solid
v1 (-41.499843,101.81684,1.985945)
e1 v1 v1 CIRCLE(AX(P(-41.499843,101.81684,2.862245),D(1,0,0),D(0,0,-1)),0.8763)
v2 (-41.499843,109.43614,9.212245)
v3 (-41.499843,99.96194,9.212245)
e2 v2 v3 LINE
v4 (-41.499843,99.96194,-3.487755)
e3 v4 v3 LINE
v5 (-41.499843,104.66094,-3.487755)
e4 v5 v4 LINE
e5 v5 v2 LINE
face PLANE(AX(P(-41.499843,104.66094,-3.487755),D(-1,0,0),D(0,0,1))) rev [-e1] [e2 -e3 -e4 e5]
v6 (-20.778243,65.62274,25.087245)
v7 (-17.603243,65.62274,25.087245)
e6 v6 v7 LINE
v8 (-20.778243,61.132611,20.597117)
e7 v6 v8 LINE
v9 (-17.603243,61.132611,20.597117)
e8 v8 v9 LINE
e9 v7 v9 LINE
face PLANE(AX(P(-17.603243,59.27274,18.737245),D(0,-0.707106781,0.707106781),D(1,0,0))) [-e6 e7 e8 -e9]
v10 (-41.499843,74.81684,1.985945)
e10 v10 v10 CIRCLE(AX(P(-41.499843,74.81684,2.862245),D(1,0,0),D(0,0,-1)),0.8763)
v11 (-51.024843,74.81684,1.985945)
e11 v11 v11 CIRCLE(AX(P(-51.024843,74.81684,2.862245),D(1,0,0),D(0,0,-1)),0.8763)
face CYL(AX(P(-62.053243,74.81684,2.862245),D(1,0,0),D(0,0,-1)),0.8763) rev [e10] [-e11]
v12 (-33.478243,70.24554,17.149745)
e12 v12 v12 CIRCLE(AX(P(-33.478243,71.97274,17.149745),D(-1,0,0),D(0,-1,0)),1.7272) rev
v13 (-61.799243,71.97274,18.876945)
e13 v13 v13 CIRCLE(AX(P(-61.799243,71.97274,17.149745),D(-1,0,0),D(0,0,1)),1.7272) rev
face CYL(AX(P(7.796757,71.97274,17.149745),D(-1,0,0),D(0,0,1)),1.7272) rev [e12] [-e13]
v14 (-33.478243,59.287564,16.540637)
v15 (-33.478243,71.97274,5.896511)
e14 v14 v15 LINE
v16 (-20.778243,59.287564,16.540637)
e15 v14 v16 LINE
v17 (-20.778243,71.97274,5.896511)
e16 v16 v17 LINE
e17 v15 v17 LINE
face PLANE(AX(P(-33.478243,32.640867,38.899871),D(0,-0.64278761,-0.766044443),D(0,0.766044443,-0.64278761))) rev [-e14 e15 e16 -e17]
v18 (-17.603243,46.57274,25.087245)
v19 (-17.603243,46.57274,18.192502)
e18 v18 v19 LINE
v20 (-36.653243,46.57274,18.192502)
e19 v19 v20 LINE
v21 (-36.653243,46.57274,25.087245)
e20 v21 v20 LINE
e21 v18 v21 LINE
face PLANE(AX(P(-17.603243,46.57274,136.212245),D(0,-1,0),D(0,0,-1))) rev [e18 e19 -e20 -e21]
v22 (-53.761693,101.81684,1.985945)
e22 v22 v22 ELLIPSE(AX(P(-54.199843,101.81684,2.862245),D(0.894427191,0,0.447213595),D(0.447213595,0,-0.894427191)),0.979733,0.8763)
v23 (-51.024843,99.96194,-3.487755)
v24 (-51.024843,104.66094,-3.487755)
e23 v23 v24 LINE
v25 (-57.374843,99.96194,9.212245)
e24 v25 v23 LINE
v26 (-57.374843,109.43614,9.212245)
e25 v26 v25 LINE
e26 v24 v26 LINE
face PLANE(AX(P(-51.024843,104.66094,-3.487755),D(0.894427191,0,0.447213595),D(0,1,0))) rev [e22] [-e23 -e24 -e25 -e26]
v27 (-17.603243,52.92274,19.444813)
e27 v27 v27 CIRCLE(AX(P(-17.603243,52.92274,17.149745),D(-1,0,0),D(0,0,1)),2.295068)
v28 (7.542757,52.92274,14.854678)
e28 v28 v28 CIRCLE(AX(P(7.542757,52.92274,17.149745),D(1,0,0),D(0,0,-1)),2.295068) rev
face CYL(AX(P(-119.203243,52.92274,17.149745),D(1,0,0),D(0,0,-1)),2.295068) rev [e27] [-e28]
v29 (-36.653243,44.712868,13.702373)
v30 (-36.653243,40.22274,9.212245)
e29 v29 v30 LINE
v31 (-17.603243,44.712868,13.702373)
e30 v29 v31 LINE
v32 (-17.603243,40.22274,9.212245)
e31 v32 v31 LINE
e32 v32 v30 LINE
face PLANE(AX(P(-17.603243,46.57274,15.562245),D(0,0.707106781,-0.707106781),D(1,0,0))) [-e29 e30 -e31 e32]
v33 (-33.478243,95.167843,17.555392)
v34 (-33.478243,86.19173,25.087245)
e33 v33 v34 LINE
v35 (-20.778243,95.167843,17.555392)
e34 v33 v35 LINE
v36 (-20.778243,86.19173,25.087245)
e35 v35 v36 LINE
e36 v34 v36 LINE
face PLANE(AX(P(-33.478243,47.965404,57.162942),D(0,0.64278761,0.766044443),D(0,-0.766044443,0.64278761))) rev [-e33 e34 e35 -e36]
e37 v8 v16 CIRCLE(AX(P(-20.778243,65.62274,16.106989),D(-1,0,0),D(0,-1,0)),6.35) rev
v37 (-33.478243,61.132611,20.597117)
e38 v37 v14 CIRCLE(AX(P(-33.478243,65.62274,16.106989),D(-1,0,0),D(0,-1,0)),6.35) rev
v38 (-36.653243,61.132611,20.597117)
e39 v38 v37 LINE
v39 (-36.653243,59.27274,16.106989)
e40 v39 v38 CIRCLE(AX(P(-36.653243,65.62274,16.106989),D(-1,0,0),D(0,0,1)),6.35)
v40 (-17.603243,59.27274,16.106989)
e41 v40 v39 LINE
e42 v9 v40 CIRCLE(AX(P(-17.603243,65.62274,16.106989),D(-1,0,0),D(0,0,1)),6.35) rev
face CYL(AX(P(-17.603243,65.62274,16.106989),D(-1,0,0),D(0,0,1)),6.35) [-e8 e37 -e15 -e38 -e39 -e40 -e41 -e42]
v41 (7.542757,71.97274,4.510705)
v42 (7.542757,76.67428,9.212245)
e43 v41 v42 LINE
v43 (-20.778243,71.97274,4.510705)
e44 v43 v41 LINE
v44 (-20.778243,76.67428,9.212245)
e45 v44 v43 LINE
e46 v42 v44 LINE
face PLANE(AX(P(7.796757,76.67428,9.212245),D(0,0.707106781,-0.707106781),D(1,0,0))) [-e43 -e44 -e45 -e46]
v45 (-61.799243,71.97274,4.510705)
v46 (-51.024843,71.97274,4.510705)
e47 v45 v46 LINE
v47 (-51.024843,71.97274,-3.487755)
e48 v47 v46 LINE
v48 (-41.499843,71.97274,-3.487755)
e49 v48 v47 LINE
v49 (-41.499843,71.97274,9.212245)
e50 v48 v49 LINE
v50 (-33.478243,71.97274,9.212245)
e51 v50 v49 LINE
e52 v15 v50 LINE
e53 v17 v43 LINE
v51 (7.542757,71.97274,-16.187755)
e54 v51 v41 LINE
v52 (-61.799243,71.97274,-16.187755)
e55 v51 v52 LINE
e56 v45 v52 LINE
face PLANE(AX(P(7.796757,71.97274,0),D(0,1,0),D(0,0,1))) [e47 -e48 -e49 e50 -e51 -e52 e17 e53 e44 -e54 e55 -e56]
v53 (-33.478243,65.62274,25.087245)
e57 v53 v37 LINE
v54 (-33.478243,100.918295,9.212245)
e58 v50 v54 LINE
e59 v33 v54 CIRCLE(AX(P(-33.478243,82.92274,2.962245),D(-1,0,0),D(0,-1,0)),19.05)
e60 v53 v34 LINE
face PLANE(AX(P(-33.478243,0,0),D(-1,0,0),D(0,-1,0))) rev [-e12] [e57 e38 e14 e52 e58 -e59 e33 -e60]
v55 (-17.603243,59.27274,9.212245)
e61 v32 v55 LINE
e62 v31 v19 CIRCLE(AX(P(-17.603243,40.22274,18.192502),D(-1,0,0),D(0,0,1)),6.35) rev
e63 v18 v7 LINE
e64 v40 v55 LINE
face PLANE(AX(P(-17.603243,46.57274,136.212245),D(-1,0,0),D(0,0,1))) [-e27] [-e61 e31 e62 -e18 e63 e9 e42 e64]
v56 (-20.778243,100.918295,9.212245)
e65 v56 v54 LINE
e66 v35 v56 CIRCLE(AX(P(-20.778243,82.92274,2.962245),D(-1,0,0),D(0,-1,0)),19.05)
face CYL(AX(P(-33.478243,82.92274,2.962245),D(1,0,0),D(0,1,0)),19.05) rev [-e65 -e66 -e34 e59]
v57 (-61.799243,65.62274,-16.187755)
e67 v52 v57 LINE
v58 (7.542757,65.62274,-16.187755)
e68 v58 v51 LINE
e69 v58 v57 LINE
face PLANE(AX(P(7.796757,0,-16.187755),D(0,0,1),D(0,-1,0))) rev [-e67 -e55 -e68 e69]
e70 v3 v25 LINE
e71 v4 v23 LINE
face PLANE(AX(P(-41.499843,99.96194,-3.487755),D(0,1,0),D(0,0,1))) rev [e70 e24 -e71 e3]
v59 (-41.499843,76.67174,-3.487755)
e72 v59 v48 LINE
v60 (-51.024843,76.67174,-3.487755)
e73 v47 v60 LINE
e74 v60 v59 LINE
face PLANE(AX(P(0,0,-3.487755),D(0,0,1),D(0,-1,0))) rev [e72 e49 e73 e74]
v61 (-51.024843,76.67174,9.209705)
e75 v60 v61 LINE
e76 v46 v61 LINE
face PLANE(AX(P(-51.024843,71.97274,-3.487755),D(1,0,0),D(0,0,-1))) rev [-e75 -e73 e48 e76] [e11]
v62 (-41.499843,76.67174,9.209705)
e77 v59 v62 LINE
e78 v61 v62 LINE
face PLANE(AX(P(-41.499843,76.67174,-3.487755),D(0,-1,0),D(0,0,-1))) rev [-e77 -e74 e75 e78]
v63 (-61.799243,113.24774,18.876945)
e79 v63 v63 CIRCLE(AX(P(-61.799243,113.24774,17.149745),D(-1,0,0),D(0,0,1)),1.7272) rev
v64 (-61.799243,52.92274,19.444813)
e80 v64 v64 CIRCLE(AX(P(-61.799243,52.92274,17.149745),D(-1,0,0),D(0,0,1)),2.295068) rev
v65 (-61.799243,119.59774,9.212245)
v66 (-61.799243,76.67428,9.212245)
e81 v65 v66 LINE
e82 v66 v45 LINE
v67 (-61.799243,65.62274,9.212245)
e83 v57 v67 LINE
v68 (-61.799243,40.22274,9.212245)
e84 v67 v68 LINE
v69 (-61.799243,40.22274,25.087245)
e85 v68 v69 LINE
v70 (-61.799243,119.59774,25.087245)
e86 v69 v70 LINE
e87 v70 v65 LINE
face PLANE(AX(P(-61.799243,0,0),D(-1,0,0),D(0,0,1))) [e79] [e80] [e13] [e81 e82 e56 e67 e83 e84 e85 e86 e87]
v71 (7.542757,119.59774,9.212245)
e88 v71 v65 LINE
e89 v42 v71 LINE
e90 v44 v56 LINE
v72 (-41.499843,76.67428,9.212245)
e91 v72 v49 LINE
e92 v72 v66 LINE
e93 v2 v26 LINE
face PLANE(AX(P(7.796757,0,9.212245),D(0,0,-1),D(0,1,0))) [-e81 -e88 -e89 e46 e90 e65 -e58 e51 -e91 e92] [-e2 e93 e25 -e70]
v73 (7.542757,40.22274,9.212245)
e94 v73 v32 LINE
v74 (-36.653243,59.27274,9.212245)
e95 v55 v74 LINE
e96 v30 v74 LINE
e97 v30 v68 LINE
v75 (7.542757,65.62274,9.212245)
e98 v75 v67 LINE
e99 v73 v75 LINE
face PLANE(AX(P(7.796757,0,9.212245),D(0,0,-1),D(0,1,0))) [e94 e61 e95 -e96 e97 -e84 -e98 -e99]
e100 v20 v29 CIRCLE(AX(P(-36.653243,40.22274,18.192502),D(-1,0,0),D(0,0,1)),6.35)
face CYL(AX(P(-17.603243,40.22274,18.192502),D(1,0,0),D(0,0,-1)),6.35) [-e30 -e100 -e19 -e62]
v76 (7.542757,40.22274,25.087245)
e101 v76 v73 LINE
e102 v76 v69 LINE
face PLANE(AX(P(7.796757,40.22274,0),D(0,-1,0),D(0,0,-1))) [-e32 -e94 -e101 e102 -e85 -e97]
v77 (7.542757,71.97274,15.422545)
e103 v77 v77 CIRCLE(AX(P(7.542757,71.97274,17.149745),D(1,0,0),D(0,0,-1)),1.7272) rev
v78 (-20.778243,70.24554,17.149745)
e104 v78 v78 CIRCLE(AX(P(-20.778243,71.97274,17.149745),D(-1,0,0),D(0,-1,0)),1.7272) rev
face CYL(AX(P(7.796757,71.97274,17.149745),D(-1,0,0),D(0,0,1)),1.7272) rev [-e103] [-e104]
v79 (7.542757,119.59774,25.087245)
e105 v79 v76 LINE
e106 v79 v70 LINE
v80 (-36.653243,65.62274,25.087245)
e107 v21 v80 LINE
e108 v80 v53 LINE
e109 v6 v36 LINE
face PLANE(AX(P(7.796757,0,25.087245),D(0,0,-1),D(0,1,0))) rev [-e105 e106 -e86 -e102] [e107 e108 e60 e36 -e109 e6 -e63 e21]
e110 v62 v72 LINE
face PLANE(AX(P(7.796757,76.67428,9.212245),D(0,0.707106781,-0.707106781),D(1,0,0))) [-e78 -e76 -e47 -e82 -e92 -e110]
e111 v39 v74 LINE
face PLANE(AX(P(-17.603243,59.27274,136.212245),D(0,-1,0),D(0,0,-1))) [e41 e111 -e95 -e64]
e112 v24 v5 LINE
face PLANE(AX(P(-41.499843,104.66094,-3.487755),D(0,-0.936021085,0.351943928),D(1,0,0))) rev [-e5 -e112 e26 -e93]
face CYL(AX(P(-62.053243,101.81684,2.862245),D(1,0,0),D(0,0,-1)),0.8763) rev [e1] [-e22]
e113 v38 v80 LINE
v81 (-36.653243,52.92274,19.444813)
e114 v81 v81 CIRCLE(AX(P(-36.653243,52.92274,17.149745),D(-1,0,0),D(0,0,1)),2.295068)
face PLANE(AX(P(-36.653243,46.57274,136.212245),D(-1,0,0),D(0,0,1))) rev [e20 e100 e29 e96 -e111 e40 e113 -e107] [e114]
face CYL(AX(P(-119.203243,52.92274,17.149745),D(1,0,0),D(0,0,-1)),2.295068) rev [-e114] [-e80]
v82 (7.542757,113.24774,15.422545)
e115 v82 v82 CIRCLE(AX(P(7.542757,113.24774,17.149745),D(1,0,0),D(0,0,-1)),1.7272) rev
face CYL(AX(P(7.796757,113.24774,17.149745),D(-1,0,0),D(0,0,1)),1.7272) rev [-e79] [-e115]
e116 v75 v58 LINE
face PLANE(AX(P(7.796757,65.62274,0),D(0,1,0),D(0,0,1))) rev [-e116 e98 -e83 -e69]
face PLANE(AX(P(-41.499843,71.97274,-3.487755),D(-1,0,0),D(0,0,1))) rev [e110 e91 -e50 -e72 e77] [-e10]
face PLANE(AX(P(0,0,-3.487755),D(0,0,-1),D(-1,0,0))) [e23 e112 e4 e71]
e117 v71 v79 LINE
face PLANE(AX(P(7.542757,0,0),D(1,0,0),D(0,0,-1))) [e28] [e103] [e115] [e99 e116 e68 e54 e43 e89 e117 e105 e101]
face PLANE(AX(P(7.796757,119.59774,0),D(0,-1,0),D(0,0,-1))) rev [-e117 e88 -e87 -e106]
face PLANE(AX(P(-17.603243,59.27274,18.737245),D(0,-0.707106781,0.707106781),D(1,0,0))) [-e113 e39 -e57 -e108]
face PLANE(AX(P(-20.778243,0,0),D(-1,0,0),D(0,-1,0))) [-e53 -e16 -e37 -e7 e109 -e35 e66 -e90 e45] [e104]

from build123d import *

# Parameters (mm, degrees)
SKETCH2_W               = 15.875
SKETCH2_H               = 79.375
SKETCH2_R               = 1.7272
SKETCH2_W_2             = 25.4
SKETCH2_H_2             = 6.35
BOSS_EXTRUDE1_DEPTH     = 69.85
SKETCH3_W               = 19.05
SKETCH3_H               = 12.7
CUT_EXTRUDE1_DEPTH      = 127
SKETCH4_R               = 2.2950679
CUT_EXTRUDE2_DEPTH      = 127
CHAMFER1_SIZE           = 6.35
FILLET2_R               = 6.35
CUT_EXTRUDE3_DEPTH      = 6.35
CUT_EXTRUDE3_DEPTH_BACK = 6.35
SKETCH8_R               = 2.4
SKETCH10_W              = 9.525
SKETCH10_H              = 4.699
BOSS_EXTRUDE2_DEPTH     = 12.7
SKETCH12_R              = 0.8763
CUT_EXTRUDE4_DEPTH      = 132.769283049
CHAMFER2_SIZE           = 4.7752
CHAMFER2_SIZE_2         = 12.7
CHAMFER3_SIZE           = 4.70154
CHAMFER4_SIZE           = 6.35
CHAMFER4_SIZE_2         = 12.7
CUT_EXTRUDE5_DEPTH      = 0.254
CUT_EXTRUDE6_DEPTH      = 0.254


# Some blends are built 0.0001 mm under size
with BuildPart() as part:
    # Sketch2 → Boss-Extrude1 (new body)
    # profile 1 of 2: a face of its own
    with BuildSketch(Plane.ZY.offset(62.053242547)):
        with Locations((17.149745439, 79.910239505)):
            Rectangle(SKETCH2_W, SKETCH2_H)
        with Locations((17.149745439, 113.247739505)):
            Circle(SKETCH2_R, mode=Mode.SUBTRACT)
        with Locations((17.149745439, 71.972739505)):
            Circle(SKETCH2_R, mode=Mode.SUBTRACT)
    # profile 2 of 2: a face of its own
    with BuildSketch(Plane.ZY.offset(62.053242547)):
        with Locations((-3.487754561, 68.797739505)):
            Rectangle(SKETCH2_W_2, SKETCH2_H_2)
    extrude(amount=-BOSS_EXTRUDE1_DEPTH)

    # Sketch3 → Cut-Extrude1 (cut)
    with BuildSketch(Plane(origin=(0, 0, 9.212245439), x_dir=(-1, 0, 0), z_dir=(0, 0, -1))):
        with Locations((27.128242547, 52.922739505)):
            Rectangle(SKETCH3_W, SKETCH3_H)
    extrude(amount=-CUT_EXTRUDE1_DEPTH, mode=Mode.SUBTRACT)

    # Sketch4 → Cut-Extrude2 (cut)
    with BuildSketch(Plane(origin=(7.796757453, 0, 0), x_dir=(0, 0, -1), z_dir=(1, 0, 0))):
        with Locations(Location((-17.149745439, 52.922739505, 0), (0, 0, 180))):
            Circle(SKETCH4_R)
    extrude(amount=-CUT_EXTRUDE2_DEPTH, mode=Mode.SUBTRACT)

    # Chamfer1
    chamfer1_edges = [part.edges().sort_by_distance(p)[0] for p in [
        (-27.128242547, 59.272739505, 25.087245439),
        (-27.128242547, 46.572739505, 9.212245439),
    ]]
    chamfer(chamfer1_edges, length=CHAMFER1_SIZE - 0.0001)  # a hair under: the kernel refuses the full size

    # Fillet2
    fillet2_edges = [part.edges().sort_by_distance(p)[0] for p in [
        (-27.128242547, 59.272739505, 18.737345439),
        (-27.128242547, 46.572739505, 15.562145439),
    ]]
    fillet(fillet2_edges, radius=FILLET2_R)

    # Sketch8 → Cut-Extrude3 (cut, two sides: drawn at the far end of the back side and taken through both)
    # profile 1 of 5: a face of its own
    with BuildSketch(Plane(origin=(-27.128242547, 59.272739505, 33.482952844), x_dir=(0, 0, 1), z_dir=(-1, 0, 0)).offset(-CUT_EXTRUDE3_DEPTH_BACK)):
        with BuildLine():
            Line((-7.077924175, -7.789561181), (-20.085542155, 7.712314277))
            ThreePointArc((-20.085542155, 7.712314277), (-21.190808514, 7.041102183), (-22.339064084, 6.446418612))
            Line((-22.339064084, 6.446418612), (-9.023677061, -9.422241709))
            Line((-9.023677061, -9.422241709), (-7.077924175, -7.789561181))
        make_face()
    # profile 2 of 5: a face of its own
    with BuildSketch(Plane(origin=(-27.128242547, 59.272739505, 33.482952844), x_dir=(0, 0, 1), z_dir=(-1, 0, 0)).offset(-CUT_EXTRUDE3_DEPTH_BACK)):
        with BuildLine():
            Line((-20.085542155, 7.712314277), (-24.270707405, 12.7))
            Line((-24.270707405, 12.7), (-26.21646029, 11.067319471))
            Line((-26.21646029, 11.067319471), (-22.339064084, 6.446418612))
            ThreePointArc((-22.339064084, 6.446418612), (-21.190808514, 7.041102183), (-20.085542155, 7.712314277))
        make_face()
    # profile 3 of 5: a face of its own
    with BuildSketch(Plane(origin=(-27.128242547, 59.272739505, 33.482952844), x_dir=(0, 0, 1), z_dir=(-1, 0, 0)).offset(-CUT_EXTRUDE3_DEPTH_BACK)):
        Polygon((-26.21646029, 11.067319471), (-24.270707405, 12.7), (-27.58644192, 12.7), align=None)
    # profile 4 of 5: a face of its own
    with BuildSketch(Plane(origin=(-27.128242547, 59.272739505, 33.482952844), x_dir=(0, 0, 1), z_dir=(-1, 0, 0)).offset(-CUT_EXTRUDE3_DEPTH_BACK)):
        with BuildLine():
            ThreePointArc((-11.470707405, 23.65), (-13.762240918, 14.591506693), (-20.085542155, 7.712314277))
            Line((-20.085542155, 7.712314277), (-7.077924175, -7.789561181))
            Line((-7.077924175, -7.789561181), (9.239394359, 5.902294783))
            Line((9.239394359, 5.902294783), (-15.927560764, 35.895103965))
            ThreePointArc((-15.927560764, 35.895103965), (-12.619562979, 30.16548373), (-11.470707405, 23.65))
        make_face()
    # profile 5 of 5: a face of its own
    with BuildSketch(Plane(origin=(-27.128242547, 59.272739505, 33.482952844), x_dir=(0, 0, 1), z_dir=(-1, 0, 0)).offset(-CUT_EXTRUDE3_DEPTH_BACK)):
        with BuildLine():
            Line((-27.58644192, 12.7), (-24.270707405, 12.7))
            Line((-24.270707405, 12.7), (-20.085542155, 7.712314277))
            ThreePointArc((-20.085542155, 7.712314277), (-13.762240918, 14.591506693), (-11.470707405, 23.65))
            ThreePointArc((-11.470707405, 23.65), (-12.619562979, 30.16548373), (-15.927560764, 35.895103965))
            ThreePointArc((-15.927560764, 35.895103965), (-42.128931765, 38.754688915), (-46.109164673, 12.7))
            Line((-46.109164673, 12.7), (-27.58644192, 12.7))
        make_face()
        with Locations((-30.520707405, 23.65)):
            Circle(SKETCH8_R, mode=Mode.SUBTRACT)
    extrude(amount=CUT_EXTRUDE3_DEPTH + CUT_EXTRUDE3_DEPTH_BACK, mode=Mode.SUBTRACT)

    # Sketch10 → Boss-Extrude2 (add)
    with BuildSketch(Plane(origin=(0, 0, 9.212245439), x_dir=(-1, 0, 0), z_dir=(0, 0, -1))):
        with Locations((46.262342601, 74.322239505)):
            Rectangle(SKETCH10_W, SKETCH10_H)
        with Locations((46.262342601, 102.311439505)):
            Rectangle(SKETCH10_W, SKETCH10_H)
    extrude(amount=BOSS_EXTRUDE2_DEPTH)

    # Sketch12 → Cut-Extrude4 (cut, through all)
    with BuildSketch(Plane(origin=(-41.499842601, 0, 0), x_dir=(0, 0, -1), z_dir=(1, 0, 0))):
        with Locations((-2.862245439, 101.816839505)):
            Circle(SKETCH12_R)
        with Locations((-2.862245439, 74.816839505)):
            Circle(SKETCH12_R)
    extrude(amount=-CUT_EXTRUDE4_DEPTH, mode=Mode.SUBTRACT)

    # Chamfer2
    # the kernel refuses this chamfer: 12.7, 4.7752 mm, written as the material it adds along each edge
    with BuildSketch(Plane(origin=(-41.499842601, 104.660939505, 9.212245439), x_dir=(0, 0.9954252149618871, 0.09554392402492679), z_dir=(-1, 0, 0))) as chamfer2_piece_1:
        Polygon((CHAMFER2_SIZE * 0.995425214962, CHAMFER2_SIZE * 0.0955439240249), (-CHAMFER2_SIZE_2 * 0.0955439240249, CHAMFER2_SIZE_2 * 0.995425214962), (0, 0), align=None)
    extrude(amount=9.525)

    # Chamfer3
    # the kernel refuses this chamfer: 4.70154 mm, written as the material it adds along each edge
    with BuildSketch(Plane(origin=(-62.053242547, 71.972739505, 9.212245439), x_dir=(0, 0.9996219169112968, 0.02749587661058452), z_dir=(1, 0, 0))) as chamfer3_piece_1_section:
        Polygon((CHAMFER3_SIZE * 0.999621916911, -CHAMFER3_SIZE * 0.0274958766106), (-CHAMFER3_SIZE * 0.0274958766106, -CHAMFER3_SIZE * 0.999621916911), (0, 0), align=None)
    chamfer3_piece_1 = extrude(amount=23.119270381, mode=Mode.PRIVATE)
    chamfer3_piece_1 = split(chamfer3_piece_1, bisect_by=Plane(origin=(-41.499842601, 76.672586172, 9.211398772), z_dir=(-1, 0, 0)), keep=Keep.TOP, mode=Mode.PRIVATE)
    add(chamfer3_piece_1)
    with BuildSketch(Plane(origin=(-20.778242547, 71.972739505, 9.212245439), x_dir=(0, 0.9996219169112968, 0.02749587661058452), z_dir=(1, 0, 0))) as chamfer3_piece_2:
        Polygon((CHAMFER3_SIZE * 0.999621916911, -CHAMFER3_SIZE * 0.0274958766106), (-CHAMFER3_SIZE * 0.0274958766106, -CHAMFER3_SIZE * 0.999621916911), (0, 0), align=None)
    extrude(amount=28.575)

    # Chamfer4
    # the kernel refuses this chamfer: 12.7, 6.35 mm, written as the material it adds along each edge
    with BuildSketch(Plane(origin=(-51.024842601, 142.326966202, 9.212245439), x_dir=(-0.9976223042390326, -2.633779610739709e-14, 0.06891834360170875), z_dir=(0, -1, 0))) as chamfer4_piece_1_section:
        Polygon((CHAMFER4_SIZE * 0.997622304239, CHAMFER4_SIZE * 0.0689183436017), (-CHAMFER4_SIZE_2 * 0.0689183436017, CHAMFER4_SIZE_2 * 0.997622304239), (0, 0), align=None)
    chamfer4_piece_1 = extrude(amount=42.365026697, mode=Mode.PRIVATE)
    chamfer4_piece_1 = split(chamfer4_piece_1, bisect_by=Plane(origin=(-53.26388473, 107.534062678, 4.153530473), z_dir=(0, -0.9360210850035494, 0.35194392796122825)), keep=Keep.TOP, mode=Mode.PRIVATE)
    chamfer4_piece_1 = chamfer4_piece_1 - Plane(origin=(-53.26388473, 101.816839505, 2.862245439), x_dir=(0, 0, -1), z_dir=(1, 0, 0)) * Cylinder(0.8763, 136, mode=Mode.PRIVATE)
    add(chamfer4_piece_1)

    # Sketch13 → Cut-Extrude5 (cut)
    with BuildSketch(Plane(origin=(7.796757453, 0, 0), x_dir=(0, 0, -1), z_dir=(1, 0, 0))):
        Polygon((16.187754561, 65.622739505), (16.187754561, 71.972739505), (-4.510705439, 71.972739505), (-9.212245439, 76.674279505), (-9.212245439, 119.597739505), (-25.087245439, 119.597739505), (-25.087245439, 40.222739505), (-9.212245439, 40.222739505), (-9.212245439, 65.622739505), align=None)
    extrude(amount=-CUT_EXTRUDE5_DEPTH, mode=Mode.SUBTRACT)

    # Sketch14 → Cut-Extrude6 (cut)
    with BuildSketch(Plane.ZY.offset(62.053242547)):
        Polygon((-16.187754561, 71.972739505), (-16.187754561, 65.622739505), (9.212245439, 65.622739505), (9.212245439, 40.222739505), (25.087245439, 40.222739505), (25.087245439, 119.597739505), (9.212245439, 119.597739505), (9.212245439, 76.674279505), (4.510705439, 71.972739505), align=None)
    extrude(amount=-CUT_EXTRUDE6_DEPTH, mode=Mode.SUBTRACT)


solid = part.part
